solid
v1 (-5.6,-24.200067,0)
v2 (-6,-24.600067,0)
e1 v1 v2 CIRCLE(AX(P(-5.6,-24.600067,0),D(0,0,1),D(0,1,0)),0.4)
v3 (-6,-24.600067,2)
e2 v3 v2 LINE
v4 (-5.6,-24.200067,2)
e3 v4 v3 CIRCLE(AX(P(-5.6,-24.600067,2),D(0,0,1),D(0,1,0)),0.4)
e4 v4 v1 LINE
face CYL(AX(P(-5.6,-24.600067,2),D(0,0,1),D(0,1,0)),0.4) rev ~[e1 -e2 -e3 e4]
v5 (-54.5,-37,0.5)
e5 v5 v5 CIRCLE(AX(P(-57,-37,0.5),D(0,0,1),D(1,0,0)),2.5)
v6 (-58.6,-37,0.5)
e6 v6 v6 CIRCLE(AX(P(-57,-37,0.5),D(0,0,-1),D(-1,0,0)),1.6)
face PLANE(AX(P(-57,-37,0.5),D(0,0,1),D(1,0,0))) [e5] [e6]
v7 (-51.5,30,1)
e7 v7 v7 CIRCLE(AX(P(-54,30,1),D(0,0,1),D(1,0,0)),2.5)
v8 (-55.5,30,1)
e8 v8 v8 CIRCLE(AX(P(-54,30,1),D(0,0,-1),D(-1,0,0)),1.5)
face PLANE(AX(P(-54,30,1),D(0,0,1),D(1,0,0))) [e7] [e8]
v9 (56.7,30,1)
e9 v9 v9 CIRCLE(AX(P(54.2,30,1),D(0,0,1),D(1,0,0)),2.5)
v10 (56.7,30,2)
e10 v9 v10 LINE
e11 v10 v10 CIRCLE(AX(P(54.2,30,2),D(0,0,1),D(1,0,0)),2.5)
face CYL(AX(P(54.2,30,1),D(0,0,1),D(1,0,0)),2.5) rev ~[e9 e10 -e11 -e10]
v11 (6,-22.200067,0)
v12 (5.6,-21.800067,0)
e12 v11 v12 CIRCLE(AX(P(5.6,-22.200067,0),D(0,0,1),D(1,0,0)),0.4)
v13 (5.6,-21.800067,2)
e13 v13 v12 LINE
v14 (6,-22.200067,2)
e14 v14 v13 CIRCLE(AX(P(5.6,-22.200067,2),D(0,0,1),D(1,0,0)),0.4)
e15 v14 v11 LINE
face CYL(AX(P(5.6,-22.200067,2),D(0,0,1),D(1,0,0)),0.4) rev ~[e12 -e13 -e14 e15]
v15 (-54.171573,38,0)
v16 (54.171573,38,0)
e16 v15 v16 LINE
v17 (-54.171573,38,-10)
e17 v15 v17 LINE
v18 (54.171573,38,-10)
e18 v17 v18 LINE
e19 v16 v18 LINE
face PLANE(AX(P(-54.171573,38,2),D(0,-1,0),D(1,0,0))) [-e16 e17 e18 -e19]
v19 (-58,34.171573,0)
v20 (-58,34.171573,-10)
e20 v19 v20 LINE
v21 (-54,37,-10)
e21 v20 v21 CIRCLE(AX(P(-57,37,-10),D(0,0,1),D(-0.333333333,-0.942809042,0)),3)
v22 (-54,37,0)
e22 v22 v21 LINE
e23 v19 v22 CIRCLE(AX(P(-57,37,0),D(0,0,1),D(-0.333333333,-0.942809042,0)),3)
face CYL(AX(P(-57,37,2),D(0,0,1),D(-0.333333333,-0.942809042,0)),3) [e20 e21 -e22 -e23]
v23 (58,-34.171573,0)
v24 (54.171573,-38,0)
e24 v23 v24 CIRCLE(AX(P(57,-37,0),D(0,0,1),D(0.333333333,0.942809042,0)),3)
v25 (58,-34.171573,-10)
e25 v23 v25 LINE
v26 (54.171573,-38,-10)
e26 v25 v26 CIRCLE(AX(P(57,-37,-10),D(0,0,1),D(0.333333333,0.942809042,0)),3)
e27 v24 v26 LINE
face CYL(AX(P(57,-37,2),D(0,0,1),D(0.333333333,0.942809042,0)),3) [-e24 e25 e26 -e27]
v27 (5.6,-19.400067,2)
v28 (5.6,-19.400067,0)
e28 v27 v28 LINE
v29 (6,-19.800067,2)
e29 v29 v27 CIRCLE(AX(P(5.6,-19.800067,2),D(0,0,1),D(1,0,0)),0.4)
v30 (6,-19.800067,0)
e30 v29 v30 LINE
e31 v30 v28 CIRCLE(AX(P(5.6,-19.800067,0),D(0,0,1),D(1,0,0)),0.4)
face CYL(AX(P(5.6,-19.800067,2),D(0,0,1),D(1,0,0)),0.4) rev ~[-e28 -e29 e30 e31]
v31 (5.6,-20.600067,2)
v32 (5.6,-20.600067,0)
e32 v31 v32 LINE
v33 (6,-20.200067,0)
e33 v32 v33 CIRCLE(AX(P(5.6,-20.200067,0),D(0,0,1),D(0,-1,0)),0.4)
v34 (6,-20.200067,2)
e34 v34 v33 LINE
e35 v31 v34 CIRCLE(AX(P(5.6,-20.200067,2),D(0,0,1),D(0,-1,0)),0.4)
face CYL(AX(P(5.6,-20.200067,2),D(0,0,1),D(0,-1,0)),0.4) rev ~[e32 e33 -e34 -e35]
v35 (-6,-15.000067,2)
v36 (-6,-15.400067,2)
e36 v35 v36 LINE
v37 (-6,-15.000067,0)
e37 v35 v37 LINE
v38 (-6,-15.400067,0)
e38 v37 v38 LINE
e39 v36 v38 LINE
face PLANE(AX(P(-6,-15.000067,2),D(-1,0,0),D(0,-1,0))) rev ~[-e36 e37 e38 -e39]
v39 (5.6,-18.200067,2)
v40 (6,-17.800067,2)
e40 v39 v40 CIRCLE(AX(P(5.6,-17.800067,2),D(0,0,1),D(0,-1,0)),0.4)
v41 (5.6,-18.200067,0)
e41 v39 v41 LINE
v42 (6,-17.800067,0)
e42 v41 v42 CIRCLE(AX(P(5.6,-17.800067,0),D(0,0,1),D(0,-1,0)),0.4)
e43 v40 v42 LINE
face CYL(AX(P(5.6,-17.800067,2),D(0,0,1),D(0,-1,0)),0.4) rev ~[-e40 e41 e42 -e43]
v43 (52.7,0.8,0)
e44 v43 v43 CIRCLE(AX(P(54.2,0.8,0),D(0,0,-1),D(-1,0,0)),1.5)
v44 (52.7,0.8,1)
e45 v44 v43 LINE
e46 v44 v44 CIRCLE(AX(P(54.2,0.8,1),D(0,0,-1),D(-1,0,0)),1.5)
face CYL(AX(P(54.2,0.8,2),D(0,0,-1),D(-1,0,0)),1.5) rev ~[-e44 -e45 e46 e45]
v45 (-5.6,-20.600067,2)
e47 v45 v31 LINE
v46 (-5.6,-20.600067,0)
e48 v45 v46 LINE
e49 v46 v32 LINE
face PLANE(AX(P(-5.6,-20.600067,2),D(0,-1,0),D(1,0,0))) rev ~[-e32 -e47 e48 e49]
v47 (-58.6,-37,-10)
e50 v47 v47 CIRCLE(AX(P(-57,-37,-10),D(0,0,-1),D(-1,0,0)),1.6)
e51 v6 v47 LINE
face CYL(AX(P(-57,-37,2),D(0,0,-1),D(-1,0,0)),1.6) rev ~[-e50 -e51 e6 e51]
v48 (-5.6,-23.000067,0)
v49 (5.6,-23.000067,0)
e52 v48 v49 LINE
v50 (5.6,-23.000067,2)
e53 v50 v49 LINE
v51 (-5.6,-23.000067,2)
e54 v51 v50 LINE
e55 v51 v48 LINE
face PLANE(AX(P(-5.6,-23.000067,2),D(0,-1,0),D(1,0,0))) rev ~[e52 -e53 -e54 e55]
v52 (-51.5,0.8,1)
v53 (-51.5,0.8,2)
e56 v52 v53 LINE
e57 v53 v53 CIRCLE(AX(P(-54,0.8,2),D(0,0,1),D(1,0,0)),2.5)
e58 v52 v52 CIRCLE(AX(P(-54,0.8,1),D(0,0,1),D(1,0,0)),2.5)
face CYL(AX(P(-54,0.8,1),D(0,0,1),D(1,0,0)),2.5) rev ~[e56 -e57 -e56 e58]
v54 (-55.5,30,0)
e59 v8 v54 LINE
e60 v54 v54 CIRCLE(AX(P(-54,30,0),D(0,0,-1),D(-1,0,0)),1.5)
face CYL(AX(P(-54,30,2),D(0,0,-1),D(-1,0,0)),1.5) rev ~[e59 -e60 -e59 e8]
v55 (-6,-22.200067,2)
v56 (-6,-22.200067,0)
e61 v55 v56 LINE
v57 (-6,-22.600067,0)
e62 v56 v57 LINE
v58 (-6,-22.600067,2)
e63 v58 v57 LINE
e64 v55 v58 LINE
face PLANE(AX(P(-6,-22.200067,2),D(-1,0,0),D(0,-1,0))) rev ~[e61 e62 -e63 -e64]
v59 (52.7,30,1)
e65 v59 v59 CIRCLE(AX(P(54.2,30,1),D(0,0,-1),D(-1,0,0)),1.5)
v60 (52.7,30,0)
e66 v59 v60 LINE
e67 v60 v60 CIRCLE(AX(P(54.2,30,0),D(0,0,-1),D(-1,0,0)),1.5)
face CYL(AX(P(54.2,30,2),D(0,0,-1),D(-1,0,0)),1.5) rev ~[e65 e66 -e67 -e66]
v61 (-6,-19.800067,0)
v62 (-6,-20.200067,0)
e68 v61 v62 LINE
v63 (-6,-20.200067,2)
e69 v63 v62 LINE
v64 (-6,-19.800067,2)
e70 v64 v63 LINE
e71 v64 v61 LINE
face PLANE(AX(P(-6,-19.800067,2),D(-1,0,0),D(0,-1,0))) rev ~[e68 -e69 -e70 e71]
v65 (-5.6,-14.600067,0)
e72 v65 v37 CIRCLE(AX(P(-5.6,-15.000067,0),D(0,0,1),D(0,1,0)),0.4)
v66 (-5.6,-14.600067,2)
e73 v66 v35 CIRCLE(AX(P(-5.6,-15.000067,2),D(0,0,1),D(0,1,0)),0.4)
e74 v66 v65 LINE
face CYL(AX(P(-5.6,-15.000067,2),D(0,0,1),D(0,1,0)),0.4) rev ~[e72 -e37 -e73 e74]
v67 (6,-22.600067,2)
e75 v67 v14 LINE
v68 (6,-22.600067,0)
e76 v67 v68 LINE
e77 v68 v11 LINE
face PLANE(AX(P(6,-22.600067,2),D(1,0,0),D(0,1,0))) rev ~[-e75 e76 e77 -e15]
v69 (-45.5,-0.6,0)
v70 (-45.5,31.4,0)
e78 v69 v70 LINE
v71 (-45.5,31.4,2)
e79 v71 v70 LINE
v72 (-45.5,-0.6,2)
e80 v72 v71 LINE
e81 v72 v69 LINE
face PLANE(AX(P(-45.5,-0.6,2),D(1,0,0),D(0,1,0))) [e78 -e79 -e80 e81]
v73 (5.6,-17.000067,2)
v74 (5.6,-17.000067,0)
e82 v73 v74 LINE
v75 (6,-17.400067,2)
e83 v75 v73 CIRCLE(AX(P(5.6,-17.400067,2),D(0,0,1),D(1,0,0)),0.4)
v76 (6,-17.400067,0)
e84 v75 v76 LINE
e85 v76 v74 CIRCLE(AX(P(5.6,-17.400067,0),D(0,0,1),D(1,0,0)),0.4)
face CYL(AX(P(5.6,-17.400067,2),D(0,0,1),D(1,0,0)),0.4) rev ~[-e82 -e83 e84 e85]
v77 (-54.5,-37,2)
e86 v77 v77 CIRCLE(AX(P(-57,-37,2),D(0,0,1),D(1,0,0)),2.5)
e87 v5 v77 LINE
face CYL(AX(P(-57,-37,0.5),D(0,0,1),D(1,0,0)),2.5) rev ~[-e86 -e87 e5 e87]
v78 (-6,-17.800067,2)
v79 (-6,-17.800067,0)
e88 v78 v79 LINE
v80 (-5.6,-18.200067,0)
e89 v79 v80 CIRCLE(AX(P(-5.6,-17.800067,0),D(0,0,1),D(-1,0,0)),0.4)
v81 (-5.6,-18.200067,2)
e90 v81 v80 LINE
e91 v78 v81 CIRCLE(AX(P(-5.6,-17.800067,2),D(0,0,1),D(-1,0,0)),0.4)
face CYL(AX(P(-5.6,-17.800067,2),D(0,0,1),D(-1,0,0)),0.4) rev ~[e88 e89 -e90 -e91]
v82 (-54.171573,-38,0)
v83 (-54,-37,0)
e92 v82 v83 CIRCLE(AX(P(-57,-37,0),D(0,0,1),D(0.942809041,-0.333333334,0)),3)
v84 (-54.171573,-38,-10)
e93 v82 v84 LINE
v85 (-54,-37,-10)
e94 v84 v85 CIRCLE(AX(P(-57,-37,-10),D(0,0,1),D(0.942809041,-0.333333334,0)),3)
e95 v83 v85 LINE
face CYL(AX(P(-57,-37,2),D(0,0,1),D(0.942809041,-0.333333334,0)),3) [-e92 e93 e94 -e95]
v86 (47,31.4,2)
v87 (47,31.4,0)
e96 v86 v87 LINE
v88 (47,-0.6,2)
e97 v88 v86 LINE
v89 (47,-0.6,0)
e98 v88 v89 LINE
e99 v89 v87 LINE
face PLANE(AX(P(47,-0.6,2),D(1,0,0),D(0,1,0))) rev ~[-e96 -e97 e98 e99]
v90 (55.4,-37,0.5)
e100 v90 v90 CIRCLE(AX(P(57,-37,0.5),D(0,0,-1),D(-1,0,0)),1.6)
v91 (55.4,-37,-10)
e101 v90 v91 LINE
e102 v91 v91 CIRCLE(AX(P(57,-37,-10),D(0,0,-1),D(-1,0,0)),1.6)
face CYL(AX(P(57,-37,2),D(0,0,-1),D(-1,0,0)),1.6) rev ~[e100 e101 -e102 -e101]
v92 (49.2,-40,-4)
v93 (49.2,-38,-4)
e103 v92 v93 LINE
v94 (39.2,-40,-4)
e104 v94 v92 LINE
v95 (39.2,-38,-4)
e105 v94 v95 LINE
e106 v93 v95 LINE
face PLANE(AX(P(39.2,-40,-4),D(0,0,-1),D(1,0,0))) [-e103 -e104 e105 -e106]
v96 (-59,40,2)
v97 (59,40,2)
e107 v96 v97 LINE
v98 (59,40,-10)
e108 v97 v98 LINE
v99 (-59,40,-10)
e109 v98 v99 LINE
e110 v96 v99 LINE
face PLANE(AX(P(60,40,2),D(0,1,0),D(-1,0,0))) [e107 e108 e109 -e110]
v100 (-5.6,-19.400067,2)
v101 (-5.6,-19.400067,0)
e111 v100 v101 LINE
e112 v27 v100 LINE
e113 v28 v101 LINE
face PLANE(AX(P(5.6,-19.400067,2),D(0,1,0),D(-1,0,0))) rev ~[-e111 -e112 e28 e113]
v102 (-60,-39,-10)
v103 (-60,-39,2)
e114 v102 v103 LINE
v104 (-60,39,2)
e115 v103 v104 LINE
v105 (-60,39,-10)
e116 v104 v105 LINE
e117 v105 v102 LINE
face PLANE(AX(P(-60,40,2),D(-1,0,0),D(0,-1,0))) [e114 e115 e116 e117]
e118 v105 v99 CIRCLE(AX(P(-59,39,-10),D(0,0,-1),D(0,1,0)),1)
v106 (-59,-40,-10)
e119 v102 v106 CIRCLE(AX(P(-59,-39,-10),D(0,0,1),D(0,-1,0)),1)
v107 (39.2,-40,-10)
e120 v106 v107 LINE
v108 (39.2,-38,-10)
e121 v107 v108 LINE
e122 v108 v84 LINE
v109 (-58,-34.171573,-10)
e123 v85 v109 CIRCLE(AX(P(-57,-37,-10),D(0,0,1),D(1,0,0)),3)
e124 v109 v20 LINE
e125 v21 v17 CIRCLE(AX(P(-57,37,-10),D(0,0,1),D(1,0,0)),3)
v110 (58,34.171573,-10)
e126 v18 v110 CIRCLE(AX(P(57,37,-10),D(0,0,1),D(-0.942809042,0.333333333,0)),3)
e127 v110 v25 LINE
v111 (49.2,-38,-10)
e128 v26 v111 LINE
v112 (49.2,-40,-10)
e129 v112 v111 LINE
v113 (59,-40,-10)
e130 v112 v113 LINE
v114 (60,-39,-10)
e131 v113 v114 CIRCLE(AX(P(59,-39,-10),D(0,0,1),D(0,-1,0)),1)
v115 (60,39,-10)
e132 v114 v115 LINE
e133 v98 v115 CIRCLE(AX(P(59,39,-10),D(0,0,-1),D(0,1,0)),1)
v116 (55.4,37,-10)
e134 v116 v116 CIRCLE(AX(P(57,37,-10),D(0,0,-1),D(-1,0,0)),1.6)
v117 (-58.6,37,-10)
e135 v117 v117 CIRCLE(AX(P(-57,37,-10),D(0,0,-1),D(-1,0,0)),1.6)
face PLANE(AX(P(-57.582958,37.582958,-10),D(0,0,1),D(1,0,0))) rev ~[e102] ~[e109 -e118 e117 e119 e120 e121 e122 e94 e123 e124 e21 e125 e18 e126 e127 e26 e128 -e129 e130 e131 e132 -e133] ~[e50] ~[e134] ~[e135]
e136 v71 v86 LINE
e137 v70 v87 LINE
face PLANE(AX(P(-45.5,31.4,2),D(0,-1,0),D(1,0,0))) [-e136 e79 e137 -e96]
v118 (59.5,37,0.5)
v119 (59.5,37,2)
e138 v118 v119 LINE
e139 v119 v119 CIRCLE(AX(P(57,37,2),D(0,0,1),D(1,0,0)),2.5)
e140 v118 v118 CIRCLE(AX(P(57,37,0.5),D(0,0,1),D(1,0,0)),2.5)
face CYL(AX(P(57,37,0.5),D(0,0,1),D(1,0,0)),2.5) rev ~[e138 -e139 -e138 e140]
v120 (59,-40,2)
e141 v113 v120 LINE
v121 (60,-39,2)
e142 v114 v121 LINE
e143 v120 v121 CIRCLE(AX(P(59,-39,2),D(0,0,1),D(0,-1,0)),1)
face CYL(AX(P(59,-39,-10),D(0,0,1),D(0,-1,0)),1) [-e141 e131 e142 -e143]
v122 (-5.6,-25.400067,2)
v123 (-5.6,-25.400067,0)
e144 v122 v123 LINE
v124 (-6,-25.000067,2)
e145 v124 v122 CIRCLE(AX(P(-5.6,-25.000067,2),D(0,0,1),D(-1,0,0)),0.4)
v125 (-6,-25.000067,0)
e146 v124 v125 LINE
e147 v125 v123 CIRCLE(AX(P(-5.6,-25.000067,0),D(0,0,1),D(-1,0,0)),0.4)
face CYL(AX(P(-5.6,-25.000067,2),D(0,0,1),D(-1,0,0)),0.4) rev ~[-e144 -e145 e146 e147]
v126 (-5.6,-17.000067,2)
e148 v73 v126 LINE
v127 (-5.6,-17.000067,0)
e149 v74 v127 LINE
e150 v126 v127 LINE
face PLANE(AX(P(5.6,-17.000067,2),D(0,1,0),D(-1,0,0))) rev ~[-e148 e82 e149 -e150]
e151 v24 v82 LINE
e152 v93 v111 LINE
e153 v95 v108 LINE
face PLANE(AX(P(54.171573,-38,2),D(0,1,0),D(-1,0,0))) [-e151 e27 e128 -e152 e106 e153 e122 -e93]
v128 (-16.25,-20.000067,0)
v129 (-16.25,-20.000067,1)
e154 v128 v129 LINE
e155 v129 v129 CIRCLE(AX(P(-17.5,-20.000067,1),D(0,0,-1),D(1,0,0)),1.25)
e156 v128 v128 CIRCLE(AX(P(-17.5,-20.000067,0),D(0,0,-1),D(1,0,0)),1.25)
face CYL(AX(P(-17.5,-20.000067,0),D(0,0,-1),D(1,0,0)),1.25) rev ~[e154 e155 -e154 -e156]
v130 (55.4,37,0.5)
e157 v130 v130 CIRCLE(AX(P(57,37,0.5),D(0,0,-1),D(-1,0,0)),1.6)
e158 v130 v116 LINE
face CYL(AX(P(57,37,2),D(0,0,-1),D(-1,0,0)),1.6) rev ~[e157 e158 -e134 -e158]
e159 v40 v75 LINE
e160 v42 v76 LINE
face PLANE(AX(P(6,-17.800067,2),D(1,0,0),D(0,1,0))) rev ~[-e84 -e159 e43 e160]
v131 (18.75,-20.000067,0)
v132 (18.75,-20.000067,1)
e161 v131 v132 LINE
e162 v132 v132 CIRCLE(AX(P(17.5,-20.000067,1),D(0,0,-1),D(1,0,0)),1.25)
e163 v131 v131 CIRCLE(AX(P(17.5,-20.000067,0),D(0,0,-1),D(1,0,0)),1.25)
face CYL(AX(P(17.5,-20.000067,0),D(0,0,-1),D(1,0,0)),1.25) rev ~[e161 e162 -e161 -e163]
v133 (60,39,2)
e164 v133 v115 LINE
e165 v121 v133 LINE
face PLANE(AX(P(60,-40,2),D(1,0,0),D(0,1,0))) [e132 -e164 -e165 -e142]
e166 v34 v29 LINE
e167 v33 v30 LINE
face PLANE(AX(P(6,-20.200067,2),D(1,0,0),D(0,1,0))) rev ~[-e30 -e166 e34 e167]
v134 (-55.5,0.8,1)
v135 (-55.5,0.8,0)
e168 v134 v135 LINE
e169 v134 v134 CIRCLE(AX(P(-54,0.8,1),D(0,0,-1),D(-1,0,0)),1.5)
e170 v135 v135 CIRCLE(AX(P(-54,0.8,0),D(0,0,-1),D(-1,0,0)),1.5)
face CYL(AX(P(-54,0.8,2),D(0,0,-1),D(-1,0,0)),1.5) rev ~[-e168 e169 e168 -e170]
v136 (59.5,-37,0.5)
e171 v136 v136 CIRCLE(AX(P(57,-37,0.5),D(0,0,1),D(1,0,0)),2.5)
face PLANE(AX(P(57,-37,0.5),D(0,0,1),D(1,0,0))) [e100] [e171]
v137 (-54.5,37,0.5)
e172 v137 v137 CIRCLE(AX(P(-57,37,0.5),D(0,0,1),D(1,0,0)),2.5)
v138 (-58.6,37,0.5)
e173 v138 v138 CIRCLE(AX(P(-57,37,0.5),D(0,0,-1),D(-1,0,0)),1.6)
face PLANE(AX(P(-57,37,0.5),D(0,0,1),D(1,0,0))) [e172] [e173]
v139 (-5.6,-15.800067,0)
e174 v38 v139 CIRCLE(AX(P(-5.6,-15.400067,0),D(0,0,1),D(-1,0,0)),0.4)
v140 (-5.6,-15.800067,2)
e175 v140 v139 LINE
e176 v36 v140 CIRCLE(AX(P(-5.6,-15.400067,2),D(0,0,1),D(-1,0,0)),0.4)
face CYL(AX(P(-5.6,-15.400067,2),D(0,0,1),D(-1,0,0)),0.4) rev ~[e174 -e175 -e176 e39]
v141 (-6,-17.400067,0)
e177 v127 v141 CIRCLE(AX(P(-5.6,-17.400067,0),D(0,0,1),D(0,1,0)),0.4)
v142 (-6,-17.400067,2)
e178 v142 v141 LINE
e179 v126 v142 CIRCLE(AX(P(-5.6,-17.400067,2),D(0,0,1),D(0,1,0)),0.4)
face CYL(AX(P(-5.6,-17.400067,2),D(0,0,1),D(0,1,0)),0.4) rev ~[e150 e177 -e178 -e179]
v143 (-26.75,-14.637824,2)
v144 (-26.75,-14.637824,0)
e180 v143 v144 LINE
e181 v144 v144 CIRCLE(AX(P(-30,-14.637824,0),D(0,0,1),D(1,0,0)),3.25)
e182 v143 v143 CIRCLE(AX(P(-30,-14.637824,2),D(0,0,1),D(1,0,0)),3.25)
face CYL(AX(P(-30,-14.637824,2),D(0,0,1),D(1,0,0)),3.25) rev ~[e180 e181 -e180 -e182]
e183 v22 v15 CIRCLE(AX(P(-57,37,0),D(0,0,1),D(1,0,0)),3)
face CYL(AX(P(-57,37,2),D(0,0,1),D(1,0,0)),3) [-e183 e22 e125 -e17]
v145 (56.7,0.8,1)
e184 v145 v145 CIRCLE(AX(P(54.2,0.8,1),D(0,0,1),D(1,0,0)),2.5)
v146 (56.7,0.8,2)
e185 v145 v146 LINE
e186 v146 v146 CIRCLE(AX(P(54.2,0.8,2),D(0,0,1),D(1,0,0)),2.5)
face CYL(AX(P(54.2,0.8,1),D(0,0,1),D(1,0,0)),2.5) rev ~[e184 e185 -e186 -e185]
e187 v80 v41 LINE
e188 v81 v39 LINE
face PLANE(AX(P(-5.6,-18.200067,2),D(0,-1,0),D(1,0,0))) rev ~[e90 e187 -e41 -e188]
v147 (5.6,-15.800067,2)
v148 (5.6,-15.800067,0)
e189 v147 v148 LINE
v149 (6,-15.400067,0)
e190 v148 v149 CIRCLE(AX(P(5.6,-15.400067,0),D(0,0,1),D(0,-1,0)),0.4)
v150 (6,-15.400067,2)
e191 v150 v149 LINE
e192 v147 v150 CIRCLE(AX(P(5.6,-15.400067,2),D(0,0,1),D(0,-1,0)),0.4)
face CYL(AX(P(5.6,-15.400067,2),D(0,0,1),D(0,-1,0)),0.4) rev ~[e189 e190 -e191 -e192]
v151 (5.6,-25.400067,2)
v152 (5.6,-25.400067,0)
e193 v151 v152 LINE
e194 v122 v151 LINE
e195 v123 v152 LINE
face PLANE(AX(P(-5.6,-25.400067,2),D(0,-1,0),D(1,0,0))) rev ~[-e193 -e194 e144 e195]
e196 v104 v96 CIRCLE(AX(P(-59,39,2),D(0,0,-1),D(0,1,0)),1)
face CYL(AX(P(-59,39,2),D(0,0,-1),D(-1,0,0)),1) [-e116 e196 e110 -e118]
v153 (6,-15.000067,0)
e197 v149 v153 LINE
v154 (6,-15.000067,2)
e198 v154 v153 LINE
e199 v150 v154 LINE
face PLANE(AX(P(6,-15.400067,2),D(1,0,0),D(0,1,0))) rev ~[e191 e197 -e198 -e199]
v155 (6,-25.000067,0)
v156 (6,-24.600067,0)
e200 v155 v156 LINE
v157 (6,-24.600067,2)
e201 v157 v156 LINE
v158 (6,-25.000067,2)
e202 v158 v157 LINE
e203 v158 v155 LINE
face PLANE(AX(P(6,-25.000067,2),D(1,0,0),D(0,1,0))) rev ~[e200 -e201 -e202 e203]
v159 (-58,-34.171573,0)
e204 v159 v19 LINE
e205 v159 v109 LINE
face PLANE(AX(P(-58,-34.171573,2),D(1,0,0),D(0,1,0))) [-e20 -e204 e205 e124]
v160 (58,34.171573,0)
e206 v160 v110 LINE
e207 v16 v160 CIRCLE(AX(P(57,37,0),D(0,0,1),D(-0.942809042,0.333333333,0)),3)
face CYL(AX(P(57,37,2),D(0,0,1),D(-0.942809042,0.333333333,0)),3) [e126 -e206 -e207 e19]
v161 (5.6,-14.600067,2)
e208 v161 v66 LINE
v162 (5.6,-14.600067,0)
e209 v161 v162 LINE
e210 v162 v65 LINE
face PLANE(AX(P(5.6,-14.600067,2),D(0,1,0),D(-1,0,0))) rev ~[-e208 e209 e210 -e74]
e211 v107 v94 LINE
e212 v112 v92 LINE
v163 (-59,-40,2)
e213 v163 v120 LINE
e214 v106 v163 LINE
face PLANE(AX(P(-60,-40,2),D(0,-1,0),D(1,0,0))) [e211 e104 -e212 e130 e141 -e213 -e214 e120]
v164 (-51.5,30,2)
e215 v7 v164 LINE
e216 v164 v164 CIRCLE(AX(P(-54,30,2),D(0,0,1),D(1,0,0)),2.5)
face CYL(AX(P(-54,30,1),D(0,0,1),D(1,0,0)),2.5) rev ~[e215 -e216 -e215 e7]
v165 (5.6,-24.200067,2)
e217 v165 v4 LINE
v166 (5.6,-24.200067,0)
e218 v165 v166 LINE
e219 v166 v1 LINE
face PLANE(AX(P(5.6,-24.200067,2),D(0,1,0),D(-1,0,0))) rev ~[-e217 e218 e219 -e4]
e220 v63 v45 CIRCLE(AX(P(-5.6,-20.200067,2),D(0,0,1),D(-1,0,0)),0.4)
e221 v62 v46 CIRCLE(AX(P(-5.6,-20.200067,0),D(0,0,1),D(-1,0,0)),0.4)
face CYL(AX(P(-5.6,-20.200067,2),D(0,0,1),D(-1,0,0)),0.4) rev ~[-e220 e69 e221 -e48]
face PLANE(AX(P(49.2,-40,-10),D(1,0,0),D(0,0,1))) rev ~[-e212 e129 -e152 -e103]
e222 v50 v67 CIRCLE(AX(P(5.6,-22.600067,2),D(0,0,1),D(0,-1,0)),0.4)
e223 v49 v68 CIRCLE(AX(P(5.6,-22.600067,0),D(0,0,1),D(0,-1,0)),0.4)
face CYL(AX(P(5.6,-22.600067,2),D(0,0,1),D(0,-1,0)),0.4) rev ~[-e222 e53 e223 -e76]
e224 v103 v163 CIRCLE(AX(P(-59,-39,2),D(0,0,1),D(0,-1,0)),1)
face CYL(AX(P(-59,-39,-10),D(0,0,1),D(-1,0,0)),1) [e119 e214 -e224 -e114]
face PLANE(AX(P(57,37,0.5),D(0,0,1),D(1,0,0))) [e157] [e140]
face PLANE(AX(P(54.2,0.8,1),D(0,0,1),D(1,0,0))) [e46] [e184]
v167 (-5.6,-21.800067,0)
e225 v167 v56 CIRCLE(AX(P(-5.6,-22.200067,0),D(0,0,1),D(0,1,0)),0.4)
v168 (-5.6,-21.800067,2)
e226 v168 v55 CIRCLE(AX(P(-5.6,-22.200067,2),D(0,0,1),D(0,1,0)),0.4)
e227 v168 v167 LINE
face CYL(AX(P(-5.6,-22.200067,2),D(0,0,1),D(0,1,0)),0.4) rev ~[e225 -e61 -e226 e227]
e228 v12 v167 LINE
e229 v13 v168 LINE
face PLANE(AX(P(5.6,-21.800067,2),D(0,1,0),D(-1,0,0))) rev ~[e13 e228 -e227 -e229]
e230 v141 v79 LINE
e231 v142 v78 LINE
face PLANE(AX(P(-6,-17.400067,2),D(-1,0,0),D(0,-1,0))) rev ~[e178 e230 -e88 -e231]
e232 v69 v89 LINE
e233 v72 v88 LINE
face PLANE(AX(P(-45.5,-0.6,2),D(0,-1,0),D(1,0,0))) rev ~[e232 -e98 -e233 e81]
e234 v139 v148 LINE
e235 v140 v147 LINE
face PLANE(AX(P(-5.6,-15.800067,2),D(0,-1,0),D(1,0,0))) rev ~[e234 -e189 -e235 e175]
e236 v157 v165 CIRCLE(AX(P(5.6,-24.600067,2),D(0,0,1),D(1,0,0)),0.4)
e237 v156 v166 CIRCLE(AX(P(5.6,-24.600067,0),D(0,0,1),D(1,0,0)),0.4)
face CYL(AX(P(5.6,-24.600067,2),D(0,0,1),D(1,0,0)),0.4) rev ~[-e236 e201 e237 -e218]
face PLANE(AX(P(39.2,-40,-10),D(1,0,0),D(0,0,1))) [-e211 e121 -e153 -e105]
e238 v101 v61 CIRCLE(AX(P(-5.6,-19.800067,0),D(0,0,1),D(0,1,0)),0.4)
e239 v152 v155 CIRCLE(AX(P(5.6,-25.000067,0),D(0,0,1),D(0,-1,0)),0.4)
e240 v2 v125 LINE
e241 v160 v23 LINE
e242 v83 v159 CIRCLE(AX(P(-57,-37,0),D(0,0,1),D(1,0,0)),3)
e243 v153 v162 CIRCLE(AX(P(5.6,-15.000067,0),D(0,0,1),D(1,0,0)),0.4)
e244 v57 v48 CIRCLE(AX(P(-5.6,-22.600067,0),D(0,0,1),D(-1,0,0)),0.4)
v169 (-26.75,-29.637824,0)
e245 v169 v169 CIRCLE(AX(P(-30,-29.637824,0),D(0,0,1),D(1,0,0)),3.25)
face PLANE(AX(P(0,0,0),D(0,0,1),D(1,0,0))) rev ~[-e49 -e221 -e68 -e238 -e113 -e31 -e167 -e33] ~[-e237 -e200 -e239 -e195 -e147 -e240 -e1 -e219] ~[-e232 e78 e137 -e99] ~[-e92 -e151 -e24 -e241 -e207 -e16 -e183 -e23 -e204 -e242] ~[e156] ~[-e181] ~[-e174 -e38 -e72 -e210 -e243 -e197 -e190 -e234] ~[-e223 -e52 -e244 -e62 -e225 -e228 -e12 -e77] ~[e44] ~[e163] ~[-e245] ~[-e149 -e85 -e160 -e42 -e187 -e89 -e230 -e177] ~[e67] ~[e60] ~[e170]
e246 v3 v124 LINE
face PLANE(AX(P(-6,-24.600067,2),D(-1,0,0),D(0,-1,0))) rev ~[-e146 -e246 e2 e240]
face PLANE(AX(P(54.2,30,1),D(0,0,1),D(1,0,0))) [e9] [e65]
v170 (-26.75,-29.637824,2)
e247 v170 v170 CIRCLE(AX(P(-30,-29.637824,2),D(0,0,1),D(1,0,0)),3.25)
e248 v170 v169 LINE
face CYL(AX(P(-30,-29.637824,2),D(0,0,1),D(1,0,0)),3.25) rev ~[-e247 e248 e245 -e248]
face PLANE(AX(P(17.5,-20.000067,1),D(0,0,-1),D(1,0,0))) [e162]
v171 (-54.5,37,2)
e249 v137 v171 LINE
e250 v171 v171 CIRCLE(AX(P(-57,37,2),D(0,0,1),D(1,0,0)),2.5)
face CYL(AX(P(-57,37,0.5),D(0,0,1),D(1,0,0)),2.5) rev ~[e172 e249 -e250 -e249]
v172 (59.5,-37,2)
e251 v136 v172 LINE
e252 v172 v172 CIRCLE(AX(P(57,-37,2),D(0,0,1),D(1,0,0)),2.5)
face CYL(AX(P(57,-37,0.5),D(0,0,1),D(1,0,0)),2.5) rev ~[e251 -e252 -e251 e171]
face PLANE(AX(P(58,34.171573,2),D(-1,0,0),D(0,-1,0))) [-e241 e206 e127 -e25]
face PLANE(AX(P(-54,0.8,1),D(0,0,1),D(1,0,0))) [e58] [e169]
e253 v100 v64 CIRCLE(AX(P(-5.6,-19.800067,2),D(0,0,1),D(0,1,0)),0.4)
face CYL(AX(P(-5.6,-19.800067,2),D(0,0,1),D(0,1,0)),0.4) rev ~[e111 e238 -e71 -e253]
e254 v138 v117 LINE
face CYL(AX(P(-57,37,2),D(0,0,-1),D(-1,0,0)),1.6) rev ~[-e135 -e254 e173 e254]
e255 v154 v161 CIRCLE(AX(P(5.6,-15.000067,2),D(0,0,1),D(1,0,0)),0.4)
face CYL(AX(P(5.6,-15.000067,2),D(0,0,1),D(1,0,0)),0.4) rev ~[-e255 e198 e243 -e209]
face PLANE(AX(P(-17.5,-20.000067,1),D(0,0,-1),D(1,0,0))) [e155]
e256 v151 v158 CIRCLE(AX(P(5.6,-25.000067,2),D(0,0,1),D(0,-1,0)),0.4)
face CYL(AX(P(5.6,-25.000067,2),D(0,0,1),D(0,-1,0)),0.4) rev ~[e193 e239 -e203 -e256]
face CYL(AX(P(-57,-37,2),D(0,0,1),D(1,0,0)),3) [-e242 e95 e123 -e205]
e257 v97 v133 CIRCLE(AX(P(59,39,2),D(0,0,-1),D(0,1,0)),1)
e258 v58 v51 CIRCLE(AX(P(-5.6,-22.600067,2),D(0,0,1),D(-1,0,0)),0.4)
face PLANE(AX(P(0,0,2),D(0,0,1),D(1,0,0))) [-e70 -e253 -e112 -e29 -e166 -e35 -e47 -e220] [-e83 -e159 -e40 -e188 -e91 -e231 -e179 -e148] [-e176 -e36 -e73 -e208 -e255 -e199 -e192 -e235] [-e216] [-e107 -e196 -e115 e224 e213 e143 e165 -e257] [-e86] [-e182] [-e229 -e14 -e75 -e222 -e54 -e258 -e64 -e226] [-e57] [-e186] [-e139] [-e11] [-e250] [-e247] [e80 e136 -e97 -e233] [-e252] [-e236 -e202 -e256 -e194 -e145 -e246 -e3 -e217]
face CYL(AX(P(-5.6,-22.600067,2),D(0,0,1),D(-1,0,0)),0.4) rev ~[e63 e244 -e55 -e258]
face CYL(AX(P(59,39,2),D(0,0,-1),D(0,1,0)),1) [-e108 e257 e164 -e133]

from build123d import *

# Parameters (mm, degrees)
F0_W            = 120
F0_H            = 80
F1_DEPTH        = 2
F3_DEPTH        = 12
F5_D            = 3
F5_CBORE_D      = 5
F5_CBORE_DEPTH  = 1
F4_W            = 92.5
F4_H            = 32
F6_DEPTH        = 3
F7_W            = 10
F7_H            = 6
F8_DEPTH        = 3
F9_R            = 1
F10_R           = 3.25
F11_DEPTH       = 2
F12_R           = 1.25
F13_DEPTH       = 1
F15_D           = 3.2
F15_CBORE_D     = 5
F15_CBORE_DEPTH = 1.5


# Not quite as in the source:
# - a feature names something its author has since deleted; it is built from what else it names


with BuildPart() as f1:
    # F0 (on Top) → F1 (new body)
    with BuildSketch(Plane.XY):
        Rectangle(F0_W, F0_H)
    extrude(amount=F1_DEPTH)

    # F2 (on face) → F3 (join)
    with BuildSketch(Plane.XY.offset(2)):
        with BuildLine():
            Line((-58, 38), (-54.1715728753, 38))
            ThreePointArc((-54.1715728753, 38), (-55.2679491924, 39.4494897428), (-57, 40))
            ThreePointArc((-57, 40), (-59.1213203436, 39.1213203436), (-60, 37))
            ThreePointArc((-60, 37), (-59.4494897428, 35.2679491924), (-58, 34.1715728753))
            Line((-58, 34.1715728753), (-58, 38))
        make_face()
        with BuildLine():
            ThreePointArc((-60, 37), (-59.1213203436, 39.1213203436), (-57, 40))
            Line((-57, 40), (-60, 40))
            Line((-60, 40), (-60, 37))
        make_face()
        with BuildLine():
            ThreePointArc((-54, 37), (-54.043204321, 37.5073059362), (-54.1715728753, 38))
            Line((-54.1715728753, 38), (-58, 38))
            Line((-58, 38), (-58, 34.1715728753))
            ThreePointArc((-58, 34.1715728753), (-55.2679491924, 34.5505102572), (-54, 37))
        make_face()
        with BuildLine():
            Line((-58, -34.1715728753), (-58, 34.1715728753))
            ThreePointArc((-58, 34.1715728753), (-59.4494897428, 35.2679491924), (-60, 37))
            Line((-60, 37), (-60, -37))
            ThreePointArc((-60, -37), (-59.4494897428, -35.2679491924), (-58, -34.1715728753))
        make_face()
        with BuildLine():
            Line((-54.1715728753, 38), (54.1715728753, 38))
            ThreePointArc((54.1715728753, 38), (55.2679491924, 39.4494897428), (57, 40))
            Line((57, 40), (-57, 40))
            ThreePointArc((-57, 40), (-55.2679491924, 39.4494897428), (-54.1715728753, 38))
        make_face()
        with BuildLine():
            Line((54.1715728753, 38), (58, 38))
            Line((58, 38), (58, 34.1715728753))
            ThreePointArc((58, 34.1715728753), (59.4494897428, 35.2679491924), (60, 37))
            ThreePointArc((60, 37), (59.1213203436, 39.1213203436), (57, 40))
            ThreePointArc((57, 40), (55.2679491924, 39.4494897428), (54.1715728753, 38))
        make_face()
        with BuildLine():
            Line((58, 34.1715728753), (58, 38))
            Line((58, 38), (54.1715728753, 38))
            ThreePointArc((54.1715728753, 38), (54.8786796564, 34.8786796564), (58, 34.1715728753))
        make_face()
        with BuildLine():
            Line((60, 40), (57, 40))
            ThreePointArc((57, 40), (59.1213203436, 39.1213203436), (60, 37))
            Line((60, 37), (60, 40))
        make_face()
        with BuildLine():
            ThreePointArc((60, 37), (59.4494897428, 35.2679491924), (58, 34.1715728753))
            Line((58, 34.1715728753), (58, -34.1715728753))
            ThreePointArc((58, -34.1715728753), (59.4494897428, -35.2679491924), (60, -37))
            Line((60, -37), (60, 37))
        make_face()
        with BuildLine():
            Line((60, -40), (60, -37))
            ThreePointArc((60, -37), (59.1213203436, -39.1213203436), (57, -40))
            Line((57, -40), (60, -40))
        make_face()
        with BuildLine():
            ThreePointArc((60, -37), (59.4494897428, -35.2679491924), (58, -34.1715728753))
            Line((58, -34.1715728753), (58, -38))
            Line((58, -38), (54.1715728753, -38))
            ThreePointArc((54.1715728753, -38), (55.2679491924, -39.4494897428), (57, -40))
            ThreePointArc((57, -40), (59.1213203436, -39.1213203436), (60, -37))
        make_face()
        with BuildLine():
            Line((58, -38), (58, -34.1715728753))
            ThreePointArc((58, -34.1715728753), (54.8786796564, -34.8786796564), (54.1715728753, -38))
            Line((54.1715728753, -38), (58, -38))
        make_face()
        with BuildLine():
            ThreePointArc((57, -40), (55.2679491924, -39.4494897428), (54.1715728753, -38))
            Line((54.1715728753, -38), (-54.1715728753, -38))
            ThreePointArc((-54.1715728753, -38), (-55.2679491924, -39.4494897428), (-57, -40))
            Line((-57, -40), (57, -40))
        make_face()
        with BuildLine():
            ThreePointArc((-57, -40), (-59.1213203436, -39.1213203436), (-60, -37))
            Line((-60, -37), (-60, -40))
            Line((-60, -40), (-57, -40))
        make_face()
        with BuildLine():
            ThreePointArc((-57, -40), (-55.2679491924, -39.4494897428), (-54.1715728753, -38))
            Line((-54.1715728753, -38), (-58, -38))
            Line((-58, -38), (-58, -34.1715728753))
            ThreePointArc((-58, -34.1715728753), (-59.4494897428, -35.2679491924), (-60, -37))
            ThreePointArc((-60, -37), (-59.1213203436, -39.1213203436), (-57, -40))
        make_face()
        with BuildLine():
            Line((-58, -38), (-54.1715728753, -38))
            ThreePointArc((-54.1715728753, -38), (-54.043204321, -37.5073059362), (-54, -37))
            ThreePointArc((-54, -37), (-55.2679491924, -34.5505102572), (-58, -34.1715728753))
            Line((-58, -34.1715728753), (-58, -38))
        make_face()
    extrude(amount=-F3_DEPTH)

    # F5 (through all)
    with Locations(Plane.XY.offset(2)):
        with Locations((-54, 30), (-54, 0.8), (54.2, 0.8), (54.2, 30)):
            CounterBoreHole(F5_D / 2, F5_CBORE_D / 2, F5_CBORE_DEPTH)

    # F4 (on face) → F6 (cut)
    with BuildSketch(Plane.XY.offset(2)):
        with Locations((0.75, 15.4)):
            Rectangle(F4_W, F4_H)
    extrude(amount=-F6_DEPTH, mode=Mode.SUBTRACT)

    # F7 (on face) → F8 (cut)
    with BuildSketch(Plane.XZ.offset(40)):
        with Locations((44.2, -7)):
            Rectangle(F7_W, F7_H)
    extrude(amount=-F8_DEPTH, mode=Mode.SUBTRACT)

    # F9
    f9_edges = [f1.edges().sort_by_distance(p)[0] for p in [
        (60, -40, -4),
        (60, 40, -4),
        (-60, -40, -4),
        (-60, 40, -4),
    ]]
    fillet(f9_edges, radius=F9_R)

    # F10 (on face) → F11 (cut, through all)
    with BuildSketch(Plane.XY.offset(2)):
        with Locations((-30, -14.6378241479)):
            Circle(F10_R)
        with Locations((-30, -29.6378241479)):
            Circle(F10_R)
        with BuildLine():
            Line((-5.6, -15.8000669783), (5.6, -15.8000669783))
            ThreePointArc((5.6, -15.8000669783), (5.8828427125, -15.6829096908), (6, -15.4000669783))
            Line((6, -15.4000669783), (6, -15.0000669783))
            ThreePointArc((6, -15.0000669783), (5.8828427125, -14.7172242658), (5.6, -14.6000669783))
            Line((5.6, -14.6000669783), (-5.6, -14.6000669783))
            ThreePointArc((-5.6, -14.6000669783), (-5.8828427125, -14.7172242658), (-6, -15.0000669783))
            Line((-6, -15.0000669783), (-6, -15.4000669783))
            ThreePointArc((-6, -15.4000669783), (-5.8828427125, -15.6829096908), (-5.6, -15.8000669783))
        make_face()
        with BuildLine():
            ThreePointArc((6, -17.4000669783), (5.8828427125, -17.1172242658), (5.6, -17.0000669783))
            Line((5.6, -17.0000669783), (-5.6, -17.0000669783))
            ThreePointArc((-5.6, -17.0000669783), (-5.8828427125, -17.1172242658), (-6, -17.4000669783))
            Line((-6, -17.4000669783), (-6, -17.8000669783))
            ThreePointArc((-6, -17.8000669783), (-5.8828427125, -18.0829096908), (-5.6, -18.2000669783))
            Line((-5.6, -18.2000669783), (5.6, -18.2000669783))
            ThreePointArc((5.6, -18.2000669783), (5.8828427125, -18.0829096908), (6, -17.8000669783))
            Line((6, -17.8000669783), (6, -17.4000669783))
        make_face()
        with BuildLine():
            ThreePointArc((6, -19.8000669783), (5.8828427125, -19.5172242658), (5.6, -19.4000669783))
            Line((5.6, -19.4000669783), (-5.6, -19.4000669783))
            ThreePointArc((-5.6, -19.4000669783), (-5.8828427125, -19.5172242658), (-6, -19.8000669783))
            Line((-6, -19.8000669783), (-6, -20.2000669783))
            ThreePointArc((-6, -20.2000669783), (-5.8828427125, -20.4829096908), (-5.6, -20.6000669783))
            Line((-5.6, -20.6000669783), (5.6, -20.6000669783))
            ThreePointArc((5.6, -20.6000669783), (5.8828427125, -20.4829096908), (6, -20.2000669783))
            Line((6, -20.2000669783), (6, -19.8000669783))
        make_face()
        with BuildLine():
            ThreePointArc((6, -22.2000669783), (5.8828427125, -21.9172242658), (5.6, -21.8000669783))
            Line((5.6, -21.8000669783), (-5.6, -21.8000669783))
            ThreePointArc((-5.6, -21.8000669783), (-5.8828427125, -21.9172242658), (-6, -22.2000669783))
            Line((-6, -22.2000669783), (-6, -22.6000669783))
            ThreePointArc((-6, -22.6000669783), (-5.8828427125, -22.8829096908), (-5.6, -23.0000669783))
            Line((-5.6, -23.0000669783), (5.6, -23.0000669783))
            ThreePointArc((5.6, -23.0000669783), (5.8828427125, -22.8829096908), (6, -22.6000669783))
            Line((6, -22.6000669783), (6, -22.2000669783))
        make_face()
        with BuildLine():
            ThreePointArc((6, -24.6000669783), (5.8828427125, -24.3172242658), (5.6, -24.2000669783))
            Line((5.6, -24.2000669783), (-5.6, -24.2000669783))
            ThreePointArc((-5.6, -24.2000669783), (-5.8828427125, -24.3172242658), (-6, -24.6000669783))
            Line((-6, -24.6000669783), (-6, -25.0000669783))
            ThreePointArc((-6, -25.0000669783), (-5.8828427125, -25.2829096908), (-5.6, -25.4000669783))
            Line((-5.6, -25.4000669783), (5.6, -25.4000669783))
            ThreePointArc((5.6, -25.4000669783), (5.8828427125, -25.2829096908), (6, -25.0000669783))
            Line((6, -25.0000669783), (6, -24.6000669783))
        make_face()
    extrude(amount=-F11_DEPTH, mode=Mode.SUBTRACT)

    # F12 (on face) → F13 (cut)
    with BuildSketch(Plane(origin=(0, 0, 0), x_dir=(1, 0, 0), z_dir=(0, 0, -1))):
        with Locations((17.5, 20.0000669783)):
            Circle(F12_R)
        with Locations((-17.5, 20.0000669783)):
            Circle(F12_R)
    extrude(amount=-F13_DEPTH, mode=Mode.SUBTRACT)

    # F15 (through all)
    with Locations(Plane.XY.offset(2)):
        with Locations((-57, 37), (57, 37), (57, -37), (-57, -37)):
            CounterBoreHole(F15_D / 2, F15_CBORE_D / 2, F15_CBORE_DEPTH)


solid = f1.part
